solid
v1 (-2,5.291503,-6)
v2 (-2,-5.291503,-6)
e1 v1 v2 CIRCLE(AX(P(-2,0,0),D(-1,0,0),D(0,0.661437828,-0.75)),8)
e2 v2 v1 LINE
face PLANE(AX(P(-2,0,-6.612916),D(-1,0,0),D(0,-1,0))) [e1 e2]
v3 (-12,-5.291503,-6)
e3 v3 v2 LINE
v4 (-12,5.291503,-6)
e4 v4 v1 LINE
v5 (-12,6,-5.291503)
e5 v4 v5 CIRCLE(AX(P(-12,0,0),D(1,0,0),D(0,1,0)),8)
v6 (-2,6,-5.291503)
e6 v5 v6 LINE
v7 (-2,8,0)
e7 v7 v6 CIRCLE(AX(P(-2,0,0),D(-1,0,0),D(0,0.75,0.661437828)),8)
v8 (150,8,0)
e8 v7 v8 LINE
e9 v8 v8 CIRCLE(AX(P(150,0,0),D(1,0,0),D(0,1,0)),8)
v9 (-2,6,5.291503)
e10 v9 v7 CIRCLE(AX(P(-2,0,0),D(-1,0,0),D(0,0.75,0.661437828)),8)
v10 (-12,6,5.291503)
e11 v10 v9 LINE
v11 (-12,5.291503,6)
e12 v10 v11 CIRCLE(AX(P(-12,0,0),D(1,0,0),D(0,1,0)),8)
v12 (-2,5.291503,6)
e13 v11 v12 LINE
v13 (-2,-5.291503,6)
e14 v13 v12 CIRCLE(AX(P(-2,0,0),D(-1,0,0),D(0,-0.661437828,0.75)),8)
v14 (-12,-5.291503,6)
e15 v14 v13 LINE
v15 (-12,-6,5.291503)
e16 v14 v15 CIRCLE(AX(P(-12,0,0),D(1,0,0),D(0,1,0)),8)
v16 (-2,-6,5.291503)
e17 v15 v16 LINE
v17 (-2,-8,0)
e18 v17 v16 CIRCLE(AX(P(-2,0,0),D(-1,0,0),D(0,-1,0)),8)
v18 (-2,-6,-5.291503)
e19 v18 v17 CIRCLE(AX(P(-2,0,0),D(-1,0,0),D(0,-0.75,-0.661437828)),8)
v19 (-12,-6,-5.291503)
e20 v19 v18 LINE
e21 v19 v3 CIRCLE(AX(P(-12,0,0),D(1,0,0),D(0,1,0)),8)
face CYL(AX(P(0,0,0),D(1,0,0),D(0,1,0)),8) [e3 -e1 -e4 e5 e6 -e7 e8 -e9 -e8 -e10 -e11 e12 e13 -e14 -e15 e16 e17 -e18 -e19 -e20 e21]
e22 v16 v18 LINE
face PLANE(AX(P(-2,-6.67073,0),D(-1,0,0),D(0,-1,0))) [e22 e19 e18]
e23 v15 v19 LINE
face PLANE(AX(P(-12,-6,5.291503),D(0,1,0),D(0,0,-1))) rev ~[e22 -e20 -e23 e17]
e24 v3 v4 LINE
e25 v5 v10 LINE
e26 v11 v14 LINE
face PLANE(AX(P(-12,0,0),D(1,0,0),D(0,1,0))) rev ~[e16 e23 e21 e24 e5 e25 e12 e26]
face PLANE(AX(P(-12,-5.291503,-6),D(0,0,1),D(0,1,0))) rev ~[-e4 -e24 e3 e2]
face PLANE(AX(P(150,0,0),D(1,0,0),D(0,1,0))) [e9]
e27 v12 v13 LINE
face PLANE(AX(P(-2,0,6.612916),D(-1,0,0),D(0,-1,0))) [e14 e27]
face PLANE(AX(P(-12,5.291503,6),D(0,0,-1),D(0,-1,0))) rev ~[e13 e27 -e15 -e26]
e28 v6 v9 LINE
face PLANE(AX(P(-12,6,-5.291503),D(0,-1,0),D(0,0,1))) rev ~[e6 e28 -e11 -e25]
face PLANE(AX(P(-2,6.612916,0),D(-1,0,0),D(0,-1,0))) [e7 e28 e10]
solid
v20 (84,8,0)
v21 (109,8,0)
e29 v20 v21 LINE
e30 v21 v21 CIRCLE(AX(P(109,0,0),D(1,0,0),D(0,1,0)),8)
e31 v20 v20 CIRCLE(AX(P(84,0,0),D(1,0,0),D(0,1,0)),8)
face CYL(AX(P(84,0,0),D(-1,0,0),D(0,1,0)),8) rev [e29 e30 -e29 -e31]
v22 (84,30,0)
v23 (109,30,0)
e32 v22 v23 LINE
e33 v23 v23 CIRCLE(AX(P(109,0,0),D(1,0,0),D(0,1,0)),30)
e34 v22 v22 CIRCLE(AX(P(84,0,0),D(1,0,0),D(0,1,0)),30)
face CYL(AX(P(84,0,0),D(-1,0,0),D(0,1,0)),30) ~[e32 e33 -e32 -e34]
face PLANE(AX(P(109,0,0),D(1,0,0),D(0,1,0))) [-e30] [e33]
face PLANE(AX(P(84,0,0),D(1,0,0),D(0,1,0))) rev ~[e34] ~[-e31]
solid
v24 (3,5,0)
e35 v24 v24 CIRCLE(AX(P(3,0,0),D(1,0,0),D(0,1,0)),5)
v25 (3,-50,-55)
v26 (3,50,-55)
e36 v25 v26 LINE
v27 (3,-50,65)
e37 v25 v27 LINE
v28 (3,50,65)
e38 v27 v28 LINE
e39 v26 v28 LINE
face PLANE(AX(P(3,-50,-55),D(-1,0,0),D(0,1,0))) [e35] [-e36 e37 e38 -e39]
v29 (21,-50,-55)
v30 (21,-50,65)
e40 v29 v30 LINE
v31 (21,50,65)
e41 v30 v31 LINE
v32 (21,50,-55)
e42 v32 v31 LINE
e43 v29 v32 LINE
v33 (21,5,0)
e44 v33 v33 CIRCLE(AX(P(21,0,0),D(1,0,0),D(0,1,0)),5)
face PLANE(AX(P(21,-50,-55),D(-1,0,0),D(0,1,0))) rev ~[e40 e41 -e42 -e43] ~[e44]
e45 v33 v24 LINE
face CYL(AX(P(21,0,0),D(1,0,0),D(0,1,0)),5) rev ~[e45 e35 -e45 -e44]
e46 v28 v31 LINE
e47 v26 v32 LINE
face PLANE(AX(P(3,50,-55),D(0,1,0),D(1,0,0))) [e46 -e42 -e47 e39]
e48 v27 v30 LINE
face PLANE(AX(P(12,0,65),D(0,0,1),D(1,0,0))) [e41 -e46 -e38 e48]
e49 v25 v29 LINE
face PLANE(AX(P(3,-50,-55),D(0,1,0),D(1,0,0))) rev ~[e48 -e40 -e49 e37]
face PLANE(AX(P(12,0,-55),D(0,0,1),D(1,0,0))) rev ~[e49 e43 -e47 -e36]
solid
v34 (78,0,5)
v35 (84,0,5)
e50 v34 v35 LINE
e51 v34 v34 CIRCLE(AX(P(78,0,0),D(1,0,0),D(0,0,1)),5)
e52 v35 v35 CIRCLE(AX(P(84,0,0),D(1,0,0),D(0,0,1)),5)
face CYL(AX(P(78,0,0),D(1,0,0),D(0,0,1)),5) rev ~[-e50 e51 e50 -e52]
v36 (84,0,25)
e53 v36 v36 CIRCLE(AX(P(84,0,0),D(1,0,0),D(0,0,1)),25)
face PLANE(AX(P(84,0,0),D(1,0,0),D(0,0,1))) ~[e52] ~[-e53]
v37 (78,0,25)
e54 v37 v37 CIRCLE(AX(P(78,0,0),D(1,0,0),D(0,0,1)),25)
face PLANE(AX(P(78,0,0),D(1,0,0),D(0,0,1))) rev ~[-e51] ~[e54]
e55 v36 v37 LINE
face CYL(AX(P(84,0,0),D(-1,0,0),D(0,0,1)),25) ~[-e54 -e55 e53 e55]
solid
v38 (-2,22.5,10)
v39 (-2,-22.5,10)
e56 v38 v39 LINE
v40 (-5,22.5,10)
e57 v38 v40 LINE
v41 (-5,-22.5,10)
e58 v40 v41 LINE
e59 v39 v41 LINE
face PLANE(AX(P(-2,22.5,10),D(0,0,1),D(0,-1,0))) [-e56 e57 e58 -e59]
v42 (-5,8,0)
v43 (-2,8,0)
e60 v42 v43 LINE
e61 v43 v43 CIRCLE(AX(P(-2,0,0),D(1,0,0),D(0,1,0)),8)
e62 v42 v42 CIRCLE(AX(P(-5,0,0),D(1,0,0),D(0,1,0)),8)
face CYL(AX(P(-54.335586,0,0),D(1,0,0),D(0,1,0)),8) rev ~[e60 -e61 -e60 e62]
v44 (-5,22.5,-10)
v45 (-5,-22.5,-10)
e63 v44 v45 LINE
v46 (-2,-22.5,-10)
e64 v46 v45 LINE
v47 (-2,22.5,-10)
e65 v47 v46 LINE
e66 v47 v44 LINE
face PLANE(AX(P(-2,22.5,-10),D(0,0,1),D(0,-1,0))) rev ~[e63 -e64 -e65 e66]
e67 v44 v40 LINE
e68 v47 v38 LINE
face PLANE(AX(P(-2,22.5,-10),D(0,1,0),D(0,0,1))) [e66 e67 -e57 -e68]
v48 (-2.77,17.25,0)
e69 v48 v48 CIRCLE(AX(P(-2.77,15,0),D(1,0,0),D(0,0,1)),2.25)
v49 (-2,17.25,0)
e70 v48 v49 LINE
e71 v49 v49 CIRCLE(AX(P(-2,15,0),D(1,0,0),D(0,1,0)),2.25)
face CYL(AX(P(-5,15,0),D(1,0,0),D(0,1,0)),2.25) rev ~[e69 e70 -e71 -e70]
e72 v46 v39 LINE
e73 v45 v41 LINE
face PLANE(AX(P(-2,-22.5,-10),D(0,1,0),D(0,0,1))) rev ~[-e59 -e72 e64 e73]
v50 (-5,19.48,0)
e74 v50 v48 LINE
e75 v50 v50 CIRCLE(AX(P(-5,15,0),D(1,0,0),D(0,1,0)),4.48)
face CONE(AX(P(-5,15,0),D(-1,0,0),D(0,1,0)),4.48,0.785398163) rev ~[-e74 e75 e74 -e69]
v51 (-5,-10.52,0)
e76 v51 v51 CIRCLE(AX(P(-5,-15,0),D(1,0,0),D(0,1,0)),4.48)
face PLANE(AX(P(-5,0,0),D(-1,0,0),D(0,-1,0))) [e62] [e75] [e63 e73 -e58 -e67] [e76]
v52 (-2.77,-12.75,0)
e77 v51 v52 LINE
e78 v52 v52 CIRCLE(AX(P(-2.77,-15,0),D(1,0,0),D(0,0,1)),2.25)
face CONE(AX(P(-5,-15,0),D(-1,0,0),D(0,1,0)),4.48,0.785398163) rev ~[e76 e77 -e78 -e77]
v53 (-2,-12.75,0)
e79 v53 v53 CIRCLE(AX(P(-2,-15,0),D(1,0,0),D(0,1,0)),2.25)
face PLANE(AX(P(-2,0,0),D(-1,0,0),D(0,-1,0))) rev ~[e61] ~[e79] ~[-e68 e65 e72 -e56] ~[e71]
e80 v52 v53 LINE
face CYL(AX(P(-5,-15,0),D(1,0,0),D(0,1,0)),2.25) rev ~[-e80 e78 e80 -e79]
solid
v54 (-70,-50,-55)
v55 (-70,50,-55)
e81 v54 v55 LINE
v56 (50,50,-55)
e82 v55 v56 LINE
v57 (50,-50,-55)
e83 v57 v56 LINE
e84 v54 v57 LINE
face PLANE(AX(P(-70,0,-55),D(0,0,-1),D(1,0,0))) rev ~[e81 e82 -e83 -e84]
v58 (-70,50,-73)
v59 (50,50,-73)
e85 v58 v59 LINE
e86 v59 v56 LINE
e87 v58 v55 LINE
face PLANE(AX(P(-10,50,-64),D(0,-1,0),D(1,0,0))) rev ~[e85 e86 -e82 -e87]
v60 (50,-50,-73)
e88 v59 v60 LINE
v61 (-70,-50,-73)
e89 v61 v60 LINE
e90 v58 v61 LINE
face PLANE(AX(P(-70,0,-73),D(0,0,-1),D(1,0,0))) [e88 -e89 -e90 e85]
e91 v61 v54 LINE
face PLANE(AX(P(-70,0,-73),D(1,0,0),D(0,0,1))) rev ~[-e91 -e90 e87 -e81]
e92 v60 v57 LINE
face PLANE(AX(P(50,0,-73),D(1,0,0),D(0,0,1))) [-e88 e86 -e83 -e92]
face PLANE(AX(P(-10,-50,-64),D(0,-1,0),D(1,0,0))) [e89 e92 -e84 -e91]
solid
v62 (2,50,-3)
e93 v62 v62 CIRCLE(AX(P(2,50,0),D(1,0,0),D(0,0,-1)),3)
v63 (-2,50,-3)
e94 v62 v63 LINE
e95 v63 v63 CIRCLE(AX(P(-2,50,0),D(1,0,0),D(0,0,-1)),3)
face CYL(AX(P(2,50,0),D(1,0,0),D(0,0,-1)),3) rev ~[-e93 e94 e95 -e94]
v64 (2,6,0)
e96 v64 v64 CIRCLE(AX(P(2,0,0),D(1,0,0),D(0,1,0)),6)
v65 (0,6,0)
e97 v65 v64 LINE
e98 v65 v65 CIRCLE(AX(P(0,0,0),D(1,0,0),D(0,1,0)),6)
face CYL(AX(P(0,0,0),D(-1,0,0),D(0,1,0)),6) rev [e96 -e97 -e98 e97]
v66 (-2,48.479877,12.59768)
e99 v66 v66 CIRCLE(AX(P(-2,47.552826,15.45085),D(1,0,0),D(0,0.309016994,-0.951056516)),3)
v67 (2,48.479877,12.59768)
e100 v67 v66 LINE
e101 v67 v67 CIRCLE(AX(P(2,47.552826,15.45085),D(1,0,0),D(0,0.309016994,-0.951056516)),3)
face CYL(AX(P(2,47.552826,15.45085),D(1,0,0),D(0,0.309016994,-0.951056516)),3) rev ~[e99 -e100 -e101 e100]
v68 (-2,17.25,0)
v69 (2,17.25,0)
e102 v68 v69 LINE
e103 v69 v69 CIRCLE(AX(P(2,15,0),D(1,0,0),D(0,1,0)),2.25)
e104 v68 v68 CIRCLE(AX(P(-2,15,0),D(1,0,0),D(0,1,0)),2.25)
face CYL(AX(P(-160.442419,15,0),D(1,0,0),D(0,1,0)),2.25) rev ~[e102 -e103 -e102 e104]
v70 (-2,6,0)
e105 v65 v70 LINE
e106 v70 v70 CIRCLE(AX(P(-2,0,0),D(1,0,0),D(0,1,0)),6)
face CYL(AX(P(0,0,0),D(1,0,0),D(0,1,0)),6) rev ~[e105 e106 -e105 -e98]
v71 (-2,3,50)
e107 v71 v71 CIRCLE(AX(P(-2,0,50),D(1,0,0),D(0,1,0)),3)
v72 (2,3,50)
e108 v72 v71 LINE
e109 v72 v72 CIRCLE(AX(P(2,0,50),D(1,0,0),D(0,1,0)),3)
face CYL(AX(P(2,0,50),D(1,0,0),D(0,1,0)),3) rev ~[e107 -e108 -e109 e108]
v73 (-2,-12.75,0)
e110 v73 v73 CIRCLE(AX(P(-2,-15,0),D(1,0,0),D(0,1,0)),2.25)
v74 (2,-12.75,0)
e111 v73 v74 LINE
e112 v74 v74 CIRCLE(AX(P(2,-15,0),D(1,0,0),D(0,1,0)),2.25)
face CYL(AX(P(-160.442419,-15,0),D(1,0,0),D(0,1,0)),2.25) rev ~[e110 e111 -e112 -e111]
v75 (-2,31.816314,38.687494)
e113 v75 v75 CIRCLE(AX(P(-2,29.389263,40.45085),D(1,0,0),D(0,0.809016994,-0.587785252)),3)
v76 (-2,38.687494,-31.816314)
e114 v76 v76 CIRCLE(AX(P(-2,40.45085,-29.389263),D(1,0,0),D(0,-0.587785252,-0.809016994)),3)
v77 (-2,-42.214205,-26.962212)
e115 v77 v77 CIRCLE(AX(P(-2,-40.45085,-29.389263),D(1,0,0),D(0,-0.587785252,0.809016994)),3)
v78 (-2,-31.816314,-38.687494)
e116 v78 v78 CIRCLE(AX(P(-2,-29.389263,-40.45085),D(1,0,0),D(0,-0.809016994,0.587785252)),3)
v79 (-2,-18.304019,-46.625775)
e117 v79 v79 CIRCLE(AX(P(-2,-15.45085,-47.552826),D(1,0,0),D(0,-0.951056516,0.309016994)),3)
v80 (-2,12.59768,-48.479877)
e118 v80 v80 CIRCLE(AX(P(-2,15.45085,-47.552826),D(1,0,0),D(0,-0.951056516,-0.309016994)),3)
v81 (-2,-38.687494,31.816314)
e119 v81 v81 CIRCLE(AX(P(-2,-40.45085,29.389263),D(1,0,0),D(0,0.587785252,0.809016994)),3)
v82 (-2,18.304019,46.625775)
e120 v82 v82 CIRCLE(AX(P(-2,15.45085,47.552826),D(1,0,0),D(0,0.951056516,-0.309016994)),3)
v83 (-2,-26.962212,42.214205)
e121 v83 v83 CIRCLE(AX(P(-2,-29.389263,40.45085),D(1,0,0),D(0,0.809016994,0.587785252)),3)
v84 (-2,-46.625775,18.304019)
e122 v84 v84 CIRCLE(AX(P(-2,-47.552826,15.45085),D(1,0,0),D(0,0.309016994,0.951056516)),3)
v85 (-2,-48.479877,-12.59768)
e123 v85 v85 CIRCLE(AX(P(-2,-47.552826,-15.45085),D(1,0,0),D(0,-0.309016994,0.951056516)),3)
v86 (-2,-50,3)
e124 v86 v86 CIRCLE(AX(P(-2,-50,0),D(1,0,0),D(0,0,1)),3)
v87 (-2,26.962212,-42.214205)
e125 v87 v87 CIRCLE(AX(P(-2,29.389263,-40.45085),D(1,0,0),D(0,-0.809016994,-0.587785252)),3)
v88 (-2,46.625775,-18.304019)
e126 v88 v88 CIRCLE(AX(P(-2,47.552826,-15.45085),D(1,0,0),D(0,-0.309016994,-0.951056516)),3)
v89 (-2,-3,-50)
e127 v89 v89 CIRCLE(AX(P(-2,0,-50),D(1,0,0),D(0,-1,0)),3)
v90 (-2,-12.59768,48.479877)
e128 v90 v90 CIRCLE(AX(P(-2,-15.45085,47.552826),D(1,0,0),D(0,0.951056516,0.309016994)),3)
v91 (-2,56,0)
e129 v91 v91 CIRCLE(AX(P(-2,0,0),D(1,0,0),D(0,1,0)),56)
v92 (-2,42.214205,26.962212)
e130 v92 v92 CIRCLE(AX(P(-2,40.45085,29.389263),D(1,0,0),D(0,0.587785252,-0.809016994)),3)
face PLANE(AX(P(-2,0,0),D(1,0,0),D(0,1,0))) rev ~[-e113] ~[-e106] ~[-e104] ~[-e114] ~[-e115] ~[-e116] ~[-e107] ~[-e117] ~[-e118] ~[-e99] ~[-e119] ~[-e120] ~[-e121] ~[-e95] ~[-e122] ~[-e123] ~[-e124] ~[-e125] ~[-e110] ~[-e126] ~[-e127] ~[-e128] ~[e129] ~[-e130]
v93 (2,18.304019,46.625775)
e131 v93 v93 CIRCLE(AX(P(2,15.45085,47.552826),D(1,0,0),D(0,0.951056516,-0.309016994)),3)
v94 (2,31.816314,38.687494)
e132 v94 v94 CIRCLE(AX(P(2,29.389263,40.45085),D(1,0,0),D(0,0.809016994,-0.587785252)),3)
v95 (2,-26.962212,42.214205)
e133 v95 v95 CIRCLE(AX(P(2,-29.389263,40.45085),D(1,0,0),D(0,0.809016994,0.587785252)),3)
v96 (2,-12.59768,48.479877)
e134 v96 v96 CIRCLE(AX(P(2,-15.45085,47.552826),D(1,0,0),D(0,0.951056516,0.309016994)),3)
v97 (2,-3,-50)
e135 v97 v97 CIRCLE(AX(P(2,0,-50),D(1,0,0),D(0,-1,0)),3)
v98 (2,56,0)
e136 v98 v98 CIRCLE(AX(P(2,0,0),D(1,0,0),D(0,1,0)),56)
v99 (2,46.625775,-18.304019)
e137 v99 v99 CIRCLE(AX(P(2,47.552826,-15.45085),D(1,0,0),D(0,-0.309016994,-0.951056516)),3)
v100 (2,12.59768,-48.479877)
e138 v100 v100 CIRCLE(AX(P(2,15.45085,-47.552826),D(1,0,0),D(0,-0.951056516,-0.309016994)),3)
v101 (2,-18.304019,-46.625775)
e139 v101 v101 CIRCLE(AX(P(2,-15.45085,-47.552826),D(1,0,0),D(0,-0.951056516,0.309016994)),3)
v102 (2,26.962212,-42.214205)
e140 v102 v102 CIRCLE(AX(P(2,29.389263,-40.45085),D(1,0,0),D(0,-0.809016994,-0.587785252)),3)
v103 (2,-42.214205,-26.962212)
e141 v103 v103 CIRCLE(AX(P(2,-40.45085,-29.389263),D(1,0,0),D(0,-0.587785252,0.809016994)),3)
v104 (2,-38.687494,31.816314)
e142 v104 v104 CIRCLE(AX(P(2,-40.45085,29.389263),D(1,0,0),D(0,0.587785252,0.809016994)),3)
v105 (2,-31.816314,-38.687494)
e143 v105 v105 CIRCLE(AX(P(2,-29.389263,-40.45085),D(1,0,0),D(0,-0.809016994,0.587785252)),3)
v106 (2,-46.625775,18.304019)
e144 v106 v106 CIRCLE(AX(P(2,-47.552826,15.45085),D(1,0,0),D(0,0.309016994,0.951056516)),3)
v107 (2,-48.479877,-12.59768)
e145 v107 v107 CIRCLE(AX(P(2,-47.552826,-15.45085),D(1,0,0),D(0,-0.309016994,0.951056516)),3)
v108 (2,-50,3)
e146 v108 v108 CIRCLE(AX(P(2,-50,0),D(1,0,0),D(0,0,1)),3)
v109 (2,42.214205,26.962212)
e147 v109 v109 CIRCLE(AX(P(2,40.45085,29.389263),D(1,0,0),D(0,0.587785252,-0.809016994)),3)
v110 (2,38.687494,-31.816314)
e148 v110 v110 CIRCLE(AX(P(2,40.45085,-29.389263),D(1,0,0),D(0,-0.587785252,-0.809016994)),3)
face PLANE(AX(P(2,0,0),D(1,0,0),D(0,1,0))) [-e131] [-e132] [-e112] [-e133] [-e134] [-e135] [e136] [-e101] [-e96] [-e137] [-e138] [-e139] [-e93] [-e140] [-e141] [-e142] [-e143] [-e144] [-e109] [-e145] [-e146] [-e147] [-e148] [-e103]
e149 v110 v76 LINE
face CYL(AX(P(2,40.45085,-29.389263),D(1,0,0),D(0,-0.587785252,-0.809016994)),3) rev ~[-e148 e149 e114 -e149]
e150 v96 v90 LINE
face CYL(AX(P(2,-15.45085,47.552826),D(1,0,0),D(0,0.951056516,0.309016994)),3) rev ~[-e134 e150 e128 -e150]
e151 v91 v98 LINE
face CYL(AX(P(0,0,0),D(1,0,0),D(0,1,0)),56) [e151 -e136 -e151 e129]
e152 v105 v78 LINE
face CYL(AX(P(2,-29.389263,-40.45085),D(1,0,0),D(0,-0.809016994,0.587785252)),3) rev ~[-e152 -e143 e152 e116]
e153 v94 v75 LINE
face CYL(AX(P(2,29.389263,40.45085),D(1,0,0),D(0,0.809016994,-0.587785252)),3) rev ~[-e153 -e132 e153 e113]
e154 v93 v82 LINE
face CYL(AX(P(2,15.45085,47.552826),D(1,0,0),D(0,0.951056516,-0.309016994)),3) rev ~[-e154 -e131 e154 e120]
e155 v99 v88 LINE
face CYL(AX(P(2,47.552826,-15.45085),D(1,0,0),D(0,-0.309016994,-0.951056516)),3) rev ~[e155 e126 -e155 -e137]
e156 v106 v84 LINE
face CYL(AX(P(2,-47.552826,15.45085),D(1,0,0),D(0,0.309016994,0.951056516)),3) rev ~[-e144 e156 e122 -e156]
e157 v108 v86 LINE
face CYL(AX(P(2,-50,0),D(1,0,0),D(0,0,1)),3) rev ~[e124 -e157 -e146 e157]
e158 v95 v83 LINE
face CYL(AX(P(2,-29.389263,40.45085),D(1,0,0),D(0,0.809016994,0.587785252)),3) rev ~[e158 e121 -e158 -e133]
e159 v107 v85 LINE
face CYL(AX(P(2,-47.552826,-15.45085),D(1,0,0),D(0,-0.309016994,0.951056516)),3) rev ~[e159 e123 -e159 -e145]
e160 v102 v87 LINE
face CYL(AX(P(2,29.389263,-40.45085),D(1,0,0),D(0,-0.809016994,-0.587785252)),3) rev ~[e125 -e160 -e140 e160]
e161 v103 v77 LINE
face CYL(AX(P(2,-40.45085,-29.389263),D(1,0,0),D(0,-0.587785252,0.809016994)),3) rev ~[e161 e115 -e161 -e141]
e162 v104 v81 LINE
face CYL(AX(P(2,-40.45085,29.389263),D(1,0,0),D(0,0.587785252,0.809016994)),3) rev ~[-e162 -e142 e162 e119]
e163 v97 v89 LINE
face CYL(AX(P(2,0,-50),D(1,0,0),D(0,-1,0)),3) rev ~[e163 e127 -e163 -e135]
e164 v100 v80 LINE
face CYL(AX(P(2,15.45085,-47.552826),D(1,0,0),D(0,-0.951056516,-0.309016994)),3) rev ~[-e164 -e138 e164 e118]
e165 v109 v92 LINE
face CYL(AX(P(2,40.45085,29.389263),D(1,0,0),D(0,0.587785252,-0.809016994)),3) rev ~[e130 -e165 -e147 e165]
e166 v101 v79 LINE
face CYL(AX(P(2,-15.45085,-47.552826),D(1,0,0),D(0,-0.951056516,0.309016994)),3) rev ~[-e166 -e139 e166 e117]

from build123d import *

# Parameters (mm, degrees)
F0_R            = 56
F0_R_2          = 6
F1_DEPTH        = 2
F1_DEPTH_BACK   = 2
F2_R            = 3
F3_DEPTH        = 4.001
F3_COPIES_COUNT = 20
F4_W            = 120
F4_H            = 18
F5_DEPTH        = 50
F5_DEPTH_BACK   = 50
F6_W            = 18
F6_H            = 100
F7_DEPTH        = 120
F8_R            = 5
F9_DEPTH        = 91.001
F10_R           = 8
F11_DEPTH       = 150
F11_DEPTH_BACK  = 12
F13_D           = 4.5
F14_W           = 45
F14_H           = 20
F15_DEPTH       = 3
F17_D           = 4.5
F17_CSINK_D     = 8.96
F17_CSINK_ANGLE = 90
F18_D           = 16
F21_R           = 30
F21_R_2         = 8
F22_DEPTH       = 25
F24_DEPTH       = 10


# Not quite as in the source:
# - a pattern or mirror of a feature is missing from the dataset's text; its kind, count and spacing are read off the source's solid


with BuildPart() as f1:
    # F0 (on Right) → F1 (new body, two sides)
    with BuildSketch(Plane.YZ) as f1_sk:
        Circle(F0_R)
        Circle(F0_R_2, mode=Mode.SUBTRACT)
    extrude(amount=F1_DEPTH)
    extrude(f1_sk.sketch, amount=-F1_DEPTH_BACK)

    # F2 (on face) → F3 (cut, through all)
    with BuildSketch(Plane.YZ.offset(2)):
        with Locations((0, 50)):
            Circle(F2_R)
    f3 = extrude(amount=-F3_DEPTH, mode=Mode.SUBTRACT)

    # F3_copies: F3 ×20 about axis
    f3_copies_axis = Axis((0, 0, 0), (1, 0, 0))
    for i in range(1, F3_COPIES_COUNT):
        add(f3.rotate(f3_copies_axis, i * 360 / F3_COPIES_COUNT), mode=Mode.SUBTRACT)

    # F13 (through all)
    with Locations(Plane(origin=(-2, 0, 0), x_dir=(0, -1, 0), z_dir=(-1, 0, 0))):
        with Locations((-15, 0), (15, 0)):
            Hole(F13_D / 2)


with BuildPart() as f5:
    # F4 (on Front) → F5 (new body, two sides)
    with BuildSketch(Plane.XZ) as f5_sk:
        with Locations((-10, -64)):
            Rectangle(F4_W, F4_H)
    extrude(amount=F5_DEPTH)
    extrude(f5_sk.sketch, amount=-F5_DEPTH_BACK)


with BuildPart() as f7:
    # F6 (on face) → F7 (new body)
    with BuildSketch(Plane.XY.offset(-55)):
        with Locations((12, 0)):
            Rectangle(F6_W, F6_H)
    extrude(amount=F7_DEPTH)

    # F8 (on face) → F9 (cut, through all)
    with BuildSketch(Plane.YZ.offset(21)):
        Circle(F8_R)
    extrude(amount=-F9_DEPTH, mode=Mode.SUBTRACT)


with BuildPart() as f11:
    # F10 (on Right) → F11 (new body, two sides)
    with BuildSketch(Plane.YZ) as f11_sk:
        Circle(F10_R)
    extrude(amount=F11_DEPTH)
    extrude(f11_sk.sketch, amount=-F11_DEPTH_BACK)

    # F23 (on face) → F24 (cut)
    with BuildSketch(Plane(origin=(-12, 0, 0), x_dir=(0, -1, 0), z_dir=(-1, 0, 0))):
        with BuildLine():
            Line((-5.2915026221, 6), (5.2915026221, 6))
            ThreePointArc((5.2915026221, 6), (0, 8), (-5.2915026221, 6))
        make_face()
        with BuildLine():
            ThreePointArc((8, 0), (7.4833147735, 2.8284271247), (6, 5.2915026221))
            Line((6, 5.2915026221), (6, -5.2915026221))
            ThreePointArc((6, -5.2915026221), (7.4833147735, -2.8284271247), (8, 0))
        make_face()
        with BuildLine():
            Line((-6, -5.2915026221), (-6, 5.2915026221))
            ThreePointArc((-6, 5.2915026221), (-8, 0), (-6, -5.2915026221))
        make_face()
        with BuildLine():
            ThreePointArc((-5.2915026221, -6), (0, -8), (5.2915026221, -6))
            Line((5.2915026221, -6), (-5.2915026221, -6))
        make_face()
        with BuildLine():
            ThreePointArc((-5.2915026221, -6), (-5.6568542495, -5.6568542495), (-6, -5.2915026221))
            Line((-6, -5.2915026221), (-6, -6))
            Line((-6, -6), (-5.2915026221, -6))
        make_face()
    extrude(amount=-F24_DEPTH, mode=Mode.SUBTRACT)


with BuildPart() as f15:
    # F14 (on face) → F15 (new body)
    with BuildSketch(Plane(origin=(-2, 0, 0), x_dir=(0, -1, 0), z_dir=(-1, 0, 0))):
        Rectangle(F14_W, F14_H)
    extrude(amount=F15_DEPTH)

    # F17 (through all)
    with Locations(Plane(origin=(-5, 0, 0), x_dir=(0, -1, 0), z_dir=(-1, 0, 0))):
        with Locations((-15, 0), (15, 0)):
            CounterSinkHole(F17_D / 2, F17_CSINK_D / 2, counter_sink_angle=F17_CSINK_ANGLE)

    # F18 (through all)
    with Locations(Plane(origin=(-5, 0, 0), x_dir=(0, -1, 0), z_dir=(-1, 0, 0))):
        with Locations((0, 0)):
            Hole(F18_D / 2)


with BuildPart() as f20:
    # F19 (on Front) → F20 (revolve)
    with BuildSketch(Plane.XZ):
        Polygon((81, 5), (84, 5), (84, 25), (81, 25), (78, 25), (78, 5), align=None)
    revolve(axis=Axis((192.5860950764, 0, 0), (1, 0, 0)))


with BuildPart() as f22:
    # F21 (on face) → F22 (new body)
    with BuildSketch(Plane.YZ.offset(84)):
        Circle(F21_R)
        Circle(F21_R_2, mode=Mode.SUBTRACT)
    extrude(amount=F22_DEPTH)


solid = Compound([f1.part, f5.part, f7.part, f11.part, f15.part, f20.part, f22.part])
